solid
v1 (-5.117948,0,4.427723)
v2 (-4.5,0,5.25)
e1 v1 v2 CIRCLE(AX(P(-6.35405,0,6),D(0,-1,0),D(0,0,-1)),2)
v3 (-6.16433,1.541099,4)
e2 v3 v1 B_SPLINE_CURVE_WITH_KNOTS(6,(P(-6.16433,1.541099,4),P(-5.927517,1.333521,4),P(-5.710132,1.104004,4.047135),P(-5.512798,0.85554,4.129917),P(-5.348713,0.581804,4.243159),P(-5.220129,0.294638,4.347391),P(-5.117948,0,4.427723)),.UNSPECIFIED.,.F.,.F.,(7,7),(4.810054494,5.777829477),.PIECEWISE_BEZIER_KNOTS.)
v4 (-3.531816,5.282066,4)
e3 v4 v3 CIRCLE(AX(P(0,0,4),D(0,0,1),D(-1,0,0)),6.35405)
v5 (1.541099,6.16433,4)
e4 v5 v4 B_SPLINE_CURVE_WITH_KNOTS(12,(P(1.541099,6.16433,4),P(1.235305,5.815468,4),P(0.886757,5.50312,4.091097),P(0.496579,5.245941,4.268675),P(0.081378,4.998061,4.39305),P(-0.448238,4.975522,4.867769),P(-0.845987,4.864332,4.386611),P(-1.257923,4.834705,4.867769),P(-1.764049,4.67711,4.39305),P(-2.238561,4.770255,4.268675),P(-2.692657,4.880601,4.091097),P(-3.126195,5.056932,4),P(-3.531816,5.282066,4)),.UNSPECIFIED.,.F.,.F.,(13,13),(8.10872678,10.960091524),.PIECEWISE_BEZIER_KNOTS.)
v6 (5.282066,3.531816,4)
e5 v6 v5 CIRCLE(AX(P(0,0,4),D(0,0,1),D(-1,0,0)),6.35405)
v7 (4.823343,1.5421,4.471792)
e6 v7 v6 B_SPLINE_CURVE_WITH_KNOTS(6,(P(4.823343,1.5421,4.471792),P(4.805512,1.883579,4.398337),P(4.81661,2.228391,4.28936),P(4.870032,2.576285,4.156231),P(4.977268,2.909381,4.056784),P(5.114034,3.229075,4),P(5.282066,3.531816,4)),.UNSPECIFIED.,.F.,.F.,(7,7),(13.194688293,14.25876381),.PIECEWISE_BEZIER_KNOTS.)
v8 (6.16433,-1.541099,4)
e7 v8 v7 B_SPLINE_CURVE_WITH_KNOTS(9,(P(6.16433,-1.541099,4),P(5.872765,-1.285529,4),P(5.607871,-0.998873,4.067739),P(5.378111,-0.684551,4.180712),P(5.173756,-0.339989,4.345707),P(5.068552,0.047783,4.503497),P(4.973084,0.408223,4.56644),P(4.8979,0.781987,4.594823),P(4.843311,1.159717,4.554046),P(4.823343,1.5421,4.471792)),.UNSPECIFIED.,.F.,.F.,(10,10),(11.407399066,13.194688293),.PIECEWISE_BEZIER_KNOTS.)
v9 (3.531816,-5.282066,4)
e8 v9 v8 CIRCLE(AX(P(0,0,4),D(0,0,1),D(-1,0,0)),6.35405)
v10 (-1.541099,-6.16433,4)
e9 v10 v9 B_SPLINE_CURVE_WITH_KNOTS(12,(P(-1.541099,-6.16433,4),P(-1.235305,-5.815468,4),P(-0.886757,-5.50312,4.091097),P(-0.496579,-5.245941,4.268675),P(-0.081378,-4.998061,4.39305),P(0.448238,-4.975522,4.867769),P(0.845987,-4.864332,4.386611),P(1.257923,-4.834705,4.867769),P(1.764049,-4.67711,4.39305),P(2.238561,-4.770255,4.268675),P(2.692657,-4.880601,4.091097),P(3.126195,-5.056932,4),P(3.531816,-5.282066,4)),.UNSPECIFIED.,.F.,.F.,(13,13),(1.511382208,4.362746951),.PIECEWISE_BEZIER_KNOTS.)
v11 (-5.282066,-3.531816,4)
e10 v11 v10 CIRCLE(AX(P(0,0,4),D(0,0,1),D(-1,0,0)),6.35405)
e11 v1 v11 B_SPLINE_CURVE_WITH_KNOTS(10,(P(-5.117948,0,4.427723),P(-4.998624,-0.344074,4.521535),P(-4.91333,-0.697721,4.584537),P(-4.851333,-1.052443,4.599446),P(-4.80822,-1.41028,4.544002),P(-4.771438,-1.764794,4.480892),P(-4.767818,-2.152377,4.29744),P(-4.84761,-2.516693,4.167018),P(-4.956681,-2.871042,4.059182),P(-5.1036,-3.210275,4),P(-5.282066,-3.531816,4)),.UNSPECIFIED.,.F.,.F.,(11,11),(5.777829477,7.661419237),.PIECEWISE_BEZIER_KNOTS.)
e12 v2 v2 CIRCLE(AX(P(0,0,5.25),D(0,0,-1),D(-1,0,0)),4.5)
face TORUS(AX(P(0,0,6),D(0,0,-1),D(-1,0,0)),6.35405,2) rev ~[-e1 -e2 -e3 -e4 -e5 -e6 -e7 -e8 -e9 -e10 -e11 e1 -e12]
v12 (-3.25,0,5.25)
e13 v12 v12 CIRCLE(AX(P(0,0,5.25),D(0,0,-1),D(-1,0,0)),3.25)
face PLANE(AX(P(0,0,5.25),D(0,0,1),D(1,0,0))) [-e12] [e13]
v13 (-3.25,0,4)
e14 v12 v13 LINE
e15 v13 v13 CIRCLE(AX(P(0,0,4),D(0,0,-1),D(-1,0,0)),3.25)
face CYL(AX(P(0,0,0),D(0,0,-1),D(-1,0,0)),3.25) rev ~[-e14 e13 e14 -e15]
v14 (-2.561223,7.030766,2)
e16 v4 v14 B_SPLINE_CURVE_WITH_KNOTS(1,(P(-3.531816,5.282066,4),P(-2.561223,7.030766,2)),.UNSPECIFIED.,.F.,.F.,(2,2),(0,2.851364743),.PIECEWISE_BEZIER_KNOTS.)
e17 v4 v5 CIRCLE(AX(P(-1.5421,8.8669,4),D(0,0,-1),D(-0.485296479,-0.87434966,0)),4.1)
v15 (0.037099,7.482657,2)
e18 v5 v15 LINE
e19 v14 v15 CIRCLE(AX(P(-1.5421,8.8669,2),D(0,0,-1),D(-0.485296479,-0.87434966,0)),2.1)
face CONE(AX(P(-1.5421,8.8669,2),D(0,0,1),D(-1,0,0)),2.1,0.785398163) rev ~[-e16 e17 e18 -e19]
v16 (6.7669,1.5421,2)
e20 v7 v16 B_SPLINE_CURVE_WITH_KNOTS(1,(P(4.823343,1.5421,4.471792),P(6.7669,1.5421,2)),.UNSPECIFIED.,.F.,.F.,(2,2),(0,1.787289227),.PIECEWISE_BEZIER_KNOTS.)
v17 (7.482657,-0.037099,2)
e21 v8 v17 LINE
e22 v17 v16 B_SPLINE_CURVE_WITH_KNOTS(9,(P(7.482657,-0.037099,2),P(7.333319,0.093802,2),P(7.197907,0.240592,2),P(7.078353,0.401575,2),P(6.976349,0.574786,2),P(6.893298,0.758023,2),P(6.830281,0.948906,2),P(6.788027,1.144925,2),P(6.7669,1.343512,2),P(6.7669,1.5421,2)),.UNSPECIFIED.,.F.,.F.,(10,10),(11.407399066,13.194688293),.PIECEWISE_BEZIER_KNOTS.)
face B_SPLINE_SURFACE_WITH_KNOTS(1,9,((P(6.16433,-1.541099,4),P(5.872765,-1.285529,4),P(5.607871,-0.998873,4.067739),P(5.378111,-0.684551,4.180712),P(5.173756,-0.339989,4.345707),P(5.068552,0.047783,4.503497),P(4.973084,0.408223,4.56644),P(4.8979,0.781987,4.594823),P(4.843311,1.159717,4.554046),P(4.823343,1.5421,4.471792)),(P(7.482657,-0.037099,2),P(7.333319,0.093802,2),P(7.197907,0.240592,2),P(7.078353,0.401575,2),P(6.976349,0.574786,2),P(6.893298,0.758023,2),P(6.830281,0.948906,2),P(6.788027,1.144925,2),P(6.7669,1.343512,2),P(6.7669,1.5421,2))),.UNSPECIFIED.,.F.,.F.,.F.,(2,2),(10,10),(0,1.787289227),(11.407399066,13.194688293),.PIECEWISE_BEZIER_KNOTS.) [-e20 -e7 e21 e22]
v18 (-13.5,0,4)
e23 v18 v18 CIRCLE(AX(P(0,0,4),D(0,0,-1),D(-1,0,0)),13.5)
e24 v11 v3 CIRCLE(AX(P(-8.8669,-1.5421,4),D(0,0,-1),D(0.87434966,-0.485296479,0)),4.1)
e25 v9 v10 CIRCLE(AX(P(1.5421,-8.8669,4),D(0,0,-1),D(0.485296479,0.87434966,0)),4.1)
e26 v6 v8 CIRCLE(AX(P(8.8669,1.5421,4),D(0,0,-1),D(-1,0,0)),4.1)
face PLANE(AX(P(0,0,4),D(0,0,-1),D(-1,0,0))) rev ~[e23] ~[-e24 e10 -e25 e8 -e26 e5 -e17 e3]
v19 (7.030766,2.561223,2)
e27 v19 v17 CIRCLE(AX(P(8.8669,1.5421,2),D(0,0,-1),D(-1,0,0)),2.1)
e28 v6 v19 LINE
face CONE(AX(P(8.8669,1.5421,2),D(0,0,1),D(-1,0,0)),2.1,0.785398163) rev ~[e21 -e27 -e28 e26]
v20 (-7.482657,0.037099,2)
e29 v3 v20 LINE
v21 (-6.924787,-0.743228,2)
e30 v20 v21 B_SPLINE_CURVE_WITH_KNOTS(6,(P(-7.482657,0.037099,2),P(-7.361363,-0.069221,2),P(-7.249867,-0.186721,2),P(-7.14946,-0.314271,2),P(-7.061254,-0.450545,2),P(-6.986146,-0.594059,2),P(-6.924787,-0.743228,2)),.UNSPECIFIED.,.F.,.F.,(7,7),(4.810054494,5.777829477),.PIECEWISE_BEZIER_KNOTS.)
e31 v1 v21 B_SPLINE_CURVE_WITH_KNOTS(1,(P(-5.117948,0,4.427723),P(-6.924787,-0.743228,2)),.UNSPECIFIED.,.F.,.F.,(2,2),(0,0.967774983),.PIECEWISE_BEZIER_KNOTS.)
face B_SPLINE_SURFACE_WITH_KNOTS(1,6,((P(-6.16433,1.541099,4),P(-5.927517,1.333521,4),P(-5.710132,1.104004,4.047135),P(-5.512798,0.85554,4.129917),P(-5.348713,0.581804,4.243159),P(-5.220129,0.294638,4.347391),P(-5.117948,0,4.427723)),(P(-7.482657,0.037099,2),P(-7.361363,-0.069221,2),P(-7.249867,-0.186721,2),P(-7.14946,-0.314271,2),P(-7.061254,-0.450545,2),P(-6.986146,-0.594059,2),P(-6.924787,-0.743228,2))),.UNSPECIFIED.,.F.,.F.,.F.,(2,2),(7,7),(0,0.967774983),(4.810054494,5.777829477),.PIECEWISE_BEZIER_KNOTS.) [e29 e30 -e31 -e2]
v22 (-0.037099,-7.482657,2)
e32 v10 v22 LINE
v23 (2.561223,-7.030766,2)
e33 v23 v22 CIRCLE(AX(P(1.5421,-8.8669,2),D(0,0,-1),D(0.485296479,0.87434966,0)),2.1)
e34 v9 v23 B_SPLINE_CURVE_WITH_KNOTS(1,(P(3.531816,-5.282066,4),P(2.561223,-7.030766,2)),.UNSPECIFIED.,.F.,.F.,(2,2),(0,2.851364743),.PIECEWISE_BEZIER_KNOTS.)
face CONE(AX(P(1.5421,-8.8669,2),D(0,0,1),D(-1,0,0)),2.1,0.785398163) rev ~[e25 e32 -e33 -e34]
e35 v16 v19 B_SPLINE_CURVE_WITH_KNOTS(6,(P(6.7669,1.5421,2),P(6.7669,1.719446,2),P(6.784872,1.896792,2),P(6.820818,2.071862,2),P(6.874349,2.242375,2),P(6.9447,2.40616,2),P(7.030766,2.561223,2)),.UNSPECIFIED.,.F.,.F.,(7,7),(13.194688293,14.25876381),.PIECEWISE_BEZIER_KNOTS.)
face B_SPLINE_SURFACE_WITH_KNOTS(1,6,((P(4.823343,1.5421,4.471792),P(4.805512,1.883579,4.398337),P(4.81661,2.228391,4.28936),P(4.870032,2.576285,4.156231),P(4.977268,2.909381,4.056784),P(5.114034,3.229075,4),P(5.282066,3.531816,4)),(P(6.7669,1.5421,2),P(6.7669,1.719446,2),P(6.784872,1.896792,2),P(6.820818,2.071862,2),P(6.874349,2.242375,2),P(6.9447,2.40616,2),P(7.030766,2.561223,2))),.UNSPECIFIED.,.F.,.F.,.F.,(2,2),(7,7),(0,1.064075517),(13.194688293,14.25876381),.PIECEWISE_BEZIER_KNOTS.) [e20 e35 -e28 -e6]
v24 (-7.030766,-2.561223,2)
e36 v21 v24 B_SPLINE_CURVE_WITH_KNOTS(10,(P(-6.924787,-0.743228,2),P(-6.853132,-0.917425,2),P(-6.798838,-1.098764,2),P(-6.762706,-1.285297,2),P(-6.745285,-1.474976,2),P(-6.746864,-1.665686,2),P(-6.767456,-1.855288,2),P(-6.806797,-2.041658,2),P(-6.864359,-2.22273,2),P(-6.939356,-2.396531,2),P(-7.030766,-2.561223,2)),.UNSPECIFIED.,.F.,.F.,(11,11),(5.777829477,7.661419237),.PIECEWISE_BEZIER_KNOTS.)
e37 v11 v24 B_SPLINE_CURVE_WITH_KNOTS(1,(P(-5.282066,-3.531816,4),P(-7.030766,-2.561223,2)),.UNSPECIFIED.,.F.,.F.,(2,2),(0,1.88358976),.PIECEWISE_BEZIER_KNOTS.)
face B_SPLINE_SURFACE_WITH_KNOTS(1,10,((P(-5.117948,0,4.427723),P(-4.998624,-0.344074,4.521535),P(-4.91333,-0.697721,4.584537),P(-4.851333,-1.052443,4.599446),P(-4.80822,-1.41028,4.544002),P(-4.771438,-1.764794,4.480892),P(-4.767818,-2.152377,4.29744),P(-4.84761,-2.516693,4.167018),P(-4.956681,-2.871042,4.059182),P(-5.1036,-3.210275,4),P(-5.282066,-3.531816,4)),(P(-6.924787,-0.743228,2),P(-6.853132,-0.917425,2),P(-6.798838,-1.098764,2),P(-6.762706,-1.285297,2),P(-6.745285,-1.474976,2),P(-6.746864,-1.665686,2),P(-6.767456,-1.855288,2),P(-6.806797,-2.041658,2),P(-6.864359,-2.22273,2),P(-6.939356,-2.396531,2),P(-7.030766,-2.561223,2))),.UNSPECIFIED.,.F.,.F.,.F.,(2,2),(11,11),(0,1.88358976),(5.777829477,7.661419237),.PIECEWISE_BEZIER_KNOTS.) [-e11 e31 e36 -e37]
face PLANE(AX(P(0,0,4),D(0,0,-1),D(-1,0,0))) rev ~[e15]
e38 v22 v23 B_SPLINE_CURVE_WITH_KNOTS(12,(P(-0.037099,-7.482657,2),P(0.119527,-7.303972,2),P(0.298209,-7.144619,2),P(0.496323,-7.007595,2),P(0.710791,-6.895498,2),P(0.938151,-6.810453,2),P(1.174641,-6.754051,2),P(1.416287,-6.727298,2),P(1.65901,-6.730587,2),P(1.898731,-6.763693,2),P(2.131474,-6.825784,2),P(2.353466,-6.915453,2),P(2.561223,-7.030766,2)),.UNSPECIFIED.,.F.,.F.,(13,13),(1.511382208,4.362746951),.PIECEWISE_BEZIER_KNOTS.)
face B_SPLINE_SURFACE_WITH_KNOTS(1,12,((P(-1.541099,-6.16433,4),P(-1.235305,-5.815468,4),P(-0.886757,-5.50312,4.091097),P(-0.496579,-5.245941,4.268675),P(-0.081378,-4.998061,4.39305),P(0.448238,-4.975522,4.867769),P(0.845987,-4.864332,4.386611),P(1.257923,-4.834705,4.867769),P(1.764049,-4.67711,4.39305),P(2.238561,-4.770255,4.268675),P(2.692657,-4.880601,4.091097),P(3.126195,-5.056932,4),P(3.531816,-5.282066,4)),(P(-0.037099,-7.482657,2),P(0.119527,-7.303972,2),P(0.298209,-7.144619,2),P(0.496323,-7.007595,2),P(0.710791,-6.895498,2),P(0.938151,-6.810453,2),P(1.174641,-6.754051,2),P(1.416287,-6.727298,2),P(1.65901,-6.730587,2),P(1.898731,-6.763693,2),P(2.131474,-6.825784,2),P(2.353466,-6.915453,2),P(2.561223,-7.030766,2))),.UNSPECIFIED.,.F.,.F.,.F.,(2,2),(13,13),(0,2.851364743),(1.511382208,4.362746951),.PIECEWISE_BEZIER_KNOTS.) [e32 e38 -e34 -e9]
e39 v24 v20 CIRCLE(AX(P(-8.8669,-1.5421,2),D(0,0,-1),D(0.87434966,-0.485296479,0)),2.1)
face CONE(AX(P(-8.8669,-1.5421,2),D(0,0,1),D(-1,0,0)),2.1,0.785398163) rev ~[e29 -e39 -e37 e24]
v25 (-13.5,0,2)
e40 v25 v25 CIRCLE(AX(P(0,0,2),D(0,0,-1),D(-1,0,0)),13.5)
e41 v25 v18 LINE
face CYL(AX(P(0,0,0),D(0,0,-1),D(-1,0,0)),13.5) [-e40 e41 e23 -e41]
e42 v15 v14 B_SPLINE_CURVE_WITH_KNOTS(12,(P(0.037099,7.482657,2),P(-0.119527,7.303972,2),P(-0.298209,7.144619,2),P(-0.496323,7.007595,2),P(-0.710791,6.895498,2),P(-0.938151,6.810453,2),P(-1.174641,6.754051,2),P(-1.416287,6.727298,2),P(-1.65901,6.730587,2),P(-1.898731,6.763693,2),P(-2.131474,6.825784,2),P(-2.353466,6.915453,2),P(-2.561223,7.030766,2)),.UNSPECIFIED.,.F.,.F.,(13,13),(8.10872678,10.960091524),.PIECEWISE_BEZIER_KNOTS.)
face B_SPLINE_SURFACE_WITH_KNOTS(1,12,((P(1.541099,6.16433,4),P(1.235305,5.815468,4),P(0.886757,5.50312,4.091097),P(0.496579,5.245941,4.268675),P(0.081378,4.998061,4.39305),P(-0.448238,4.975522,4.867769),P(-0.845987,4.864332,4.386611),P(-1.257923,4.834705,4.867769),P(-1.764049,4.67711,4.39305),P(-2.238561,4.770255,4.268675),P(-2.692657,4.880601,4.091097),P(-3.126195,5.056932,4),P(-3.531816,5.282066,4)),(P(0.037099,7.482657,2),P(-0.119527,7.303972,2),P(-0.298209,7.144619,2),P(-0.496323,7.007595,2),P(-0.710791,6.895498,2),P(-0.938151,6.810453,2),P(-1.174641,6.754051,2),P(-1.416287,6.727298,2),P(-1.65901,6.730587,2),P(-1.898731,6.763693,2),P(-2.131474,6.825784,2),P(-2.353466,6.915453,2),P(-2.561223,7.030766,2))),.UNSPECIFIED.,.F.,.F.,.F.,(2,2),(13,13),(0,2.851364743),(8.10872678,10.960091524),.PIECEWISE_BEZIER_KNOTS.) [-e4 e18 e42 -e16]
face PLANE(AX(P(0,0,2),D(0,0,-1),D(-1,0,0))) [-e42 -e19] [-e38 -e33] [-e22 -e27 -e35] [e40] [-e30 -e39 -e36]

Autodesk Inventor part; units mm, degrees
ref_plane "YZ Plane" through (0, 0, 0) normal (1, 0, 0) x (0, 1, 0)
ref_plane "XZ Plane" through (0, 0, 0) normal (0, 1, 0) x (-1, 0, 0)
ref_plane "XY Plane" through (0, 0, 0) normal (0, 0, 1) x (1, 0, 0)
sketch "Эскиз1" plane through (0, 0, 0) normal (0, 0, 1) x (1, 0, 0)
  circle A0 centre (0, 0) radius 3.25
  circle A1 centre (0, 0) radius 4.5
  dimension "d0" = 6.5
  dimension "d1" = 9
extrude "Выдавливание1" add sketch "Эскиз1" along normal blind 5.25
sketch "Эскиз2" plane through (0, 0, 0) normal (0, 0, -1) x (-1, 0, 0)
  circle A0 centre (0, 0) radius 5.5
  dimension "d4" = 11
loft "Лофт1" add profiles "Эскиз2" section 2 edges at (-4.5, 0, 5.25)
sketch "Эскиз4" plane through (0, 0, 0) normal (0, 0, -1) x (-1, 0, 0)
  circle A0 centre (0, 0) radius 3.25
  dimension "d10" = 6.5
extrude "Выдавливание2" cut sketch "Эскиз4" against normal through all
sketch "Эскиз5" plane through (0, 0, 0) normal (0, 0, -1) x (-1, 0, 0)
  circle A0 centre (-8.8669, 1.5421) radius 2.1 projected
  circle A1 centre (-1.5421, -8.8669) radius 2.1 projected
  circle A2 centre (1.5421, 8.8669) radius 2.1 projected
  circle A3 centre (8.8669, -1.5421) radius 2.1 projected
  circle A4 centre (0, 0) radius 13.5
  circle A5 centre (0, 0) radius 3.25 projected
  dimension "d13" = 27
extrude "Выдавливание3" add sketch "Эскиз5" against normal blind 4
fillet "Сопряжение1" radius 2 1 edges at (4.7381, 0, 4)
chamfer "Фаска1" distance 2 angle 45 4 edges at (0.5579, 8.8669, 4) (10.9669, 1.5421, 4) (-6.7669, -1.5421, 4) (3.6421, -8.8669, 4)
sketch "Эскиз6" plane through (0, 0, 0) normal (0, 0, -1) x (-1, 0, 0)
  circle A0 centre (0, 0) radius 13.5 projected
  circle A1 centre (8.8669, -1.5421) radius 2.1 projected
  circle A2 centre (1.5421, 8.8669) radius 2.1 projected
  circle A3 centre (-1.5421, -8.8669) radius 2.1 projected
  circle A4 centre (-8.8669, 1.5421) radius 2.1 projected
  circle A5 centre (0, 0) radius 3.25 projected
extrude "Выдавливание4" cut sketch "Эскиз6" against normal blind 2
sketch "Эскиз7" plane through (0, 0, 2) normal (0, 0, -1) x (-1, 0, 0)
  circle A0 centre (0, 0) radius 13.5 projected
  circle A1 centre (0, 0) radius 3.25 projected
  arc A2 (-7.0308, 2.5612) -> (-7.4827, -0.0371) centre (-8.8669, 1.5421) ccw projected
  arc A3 (-2.5612, -7.0308) -> (0.0371, -7.4827) centre (-1.5421, -8.8669) ccw projected
  arc A4 (2.5612, 7.0308) -> (-0.0371, 7.4827) centre (1.5421, 8.8669) ccw projected
  arc A5 (7.0308, -2.5612) -> (7.4827, 0.0371) centre (8.8669, -1.5421) ccw projected
extrude "Выдавливание5" add sketch "Эскиз7" against normal blind 2 contours A1
properties part number "втулка для крепл" material "Пластик ПЭТ"
